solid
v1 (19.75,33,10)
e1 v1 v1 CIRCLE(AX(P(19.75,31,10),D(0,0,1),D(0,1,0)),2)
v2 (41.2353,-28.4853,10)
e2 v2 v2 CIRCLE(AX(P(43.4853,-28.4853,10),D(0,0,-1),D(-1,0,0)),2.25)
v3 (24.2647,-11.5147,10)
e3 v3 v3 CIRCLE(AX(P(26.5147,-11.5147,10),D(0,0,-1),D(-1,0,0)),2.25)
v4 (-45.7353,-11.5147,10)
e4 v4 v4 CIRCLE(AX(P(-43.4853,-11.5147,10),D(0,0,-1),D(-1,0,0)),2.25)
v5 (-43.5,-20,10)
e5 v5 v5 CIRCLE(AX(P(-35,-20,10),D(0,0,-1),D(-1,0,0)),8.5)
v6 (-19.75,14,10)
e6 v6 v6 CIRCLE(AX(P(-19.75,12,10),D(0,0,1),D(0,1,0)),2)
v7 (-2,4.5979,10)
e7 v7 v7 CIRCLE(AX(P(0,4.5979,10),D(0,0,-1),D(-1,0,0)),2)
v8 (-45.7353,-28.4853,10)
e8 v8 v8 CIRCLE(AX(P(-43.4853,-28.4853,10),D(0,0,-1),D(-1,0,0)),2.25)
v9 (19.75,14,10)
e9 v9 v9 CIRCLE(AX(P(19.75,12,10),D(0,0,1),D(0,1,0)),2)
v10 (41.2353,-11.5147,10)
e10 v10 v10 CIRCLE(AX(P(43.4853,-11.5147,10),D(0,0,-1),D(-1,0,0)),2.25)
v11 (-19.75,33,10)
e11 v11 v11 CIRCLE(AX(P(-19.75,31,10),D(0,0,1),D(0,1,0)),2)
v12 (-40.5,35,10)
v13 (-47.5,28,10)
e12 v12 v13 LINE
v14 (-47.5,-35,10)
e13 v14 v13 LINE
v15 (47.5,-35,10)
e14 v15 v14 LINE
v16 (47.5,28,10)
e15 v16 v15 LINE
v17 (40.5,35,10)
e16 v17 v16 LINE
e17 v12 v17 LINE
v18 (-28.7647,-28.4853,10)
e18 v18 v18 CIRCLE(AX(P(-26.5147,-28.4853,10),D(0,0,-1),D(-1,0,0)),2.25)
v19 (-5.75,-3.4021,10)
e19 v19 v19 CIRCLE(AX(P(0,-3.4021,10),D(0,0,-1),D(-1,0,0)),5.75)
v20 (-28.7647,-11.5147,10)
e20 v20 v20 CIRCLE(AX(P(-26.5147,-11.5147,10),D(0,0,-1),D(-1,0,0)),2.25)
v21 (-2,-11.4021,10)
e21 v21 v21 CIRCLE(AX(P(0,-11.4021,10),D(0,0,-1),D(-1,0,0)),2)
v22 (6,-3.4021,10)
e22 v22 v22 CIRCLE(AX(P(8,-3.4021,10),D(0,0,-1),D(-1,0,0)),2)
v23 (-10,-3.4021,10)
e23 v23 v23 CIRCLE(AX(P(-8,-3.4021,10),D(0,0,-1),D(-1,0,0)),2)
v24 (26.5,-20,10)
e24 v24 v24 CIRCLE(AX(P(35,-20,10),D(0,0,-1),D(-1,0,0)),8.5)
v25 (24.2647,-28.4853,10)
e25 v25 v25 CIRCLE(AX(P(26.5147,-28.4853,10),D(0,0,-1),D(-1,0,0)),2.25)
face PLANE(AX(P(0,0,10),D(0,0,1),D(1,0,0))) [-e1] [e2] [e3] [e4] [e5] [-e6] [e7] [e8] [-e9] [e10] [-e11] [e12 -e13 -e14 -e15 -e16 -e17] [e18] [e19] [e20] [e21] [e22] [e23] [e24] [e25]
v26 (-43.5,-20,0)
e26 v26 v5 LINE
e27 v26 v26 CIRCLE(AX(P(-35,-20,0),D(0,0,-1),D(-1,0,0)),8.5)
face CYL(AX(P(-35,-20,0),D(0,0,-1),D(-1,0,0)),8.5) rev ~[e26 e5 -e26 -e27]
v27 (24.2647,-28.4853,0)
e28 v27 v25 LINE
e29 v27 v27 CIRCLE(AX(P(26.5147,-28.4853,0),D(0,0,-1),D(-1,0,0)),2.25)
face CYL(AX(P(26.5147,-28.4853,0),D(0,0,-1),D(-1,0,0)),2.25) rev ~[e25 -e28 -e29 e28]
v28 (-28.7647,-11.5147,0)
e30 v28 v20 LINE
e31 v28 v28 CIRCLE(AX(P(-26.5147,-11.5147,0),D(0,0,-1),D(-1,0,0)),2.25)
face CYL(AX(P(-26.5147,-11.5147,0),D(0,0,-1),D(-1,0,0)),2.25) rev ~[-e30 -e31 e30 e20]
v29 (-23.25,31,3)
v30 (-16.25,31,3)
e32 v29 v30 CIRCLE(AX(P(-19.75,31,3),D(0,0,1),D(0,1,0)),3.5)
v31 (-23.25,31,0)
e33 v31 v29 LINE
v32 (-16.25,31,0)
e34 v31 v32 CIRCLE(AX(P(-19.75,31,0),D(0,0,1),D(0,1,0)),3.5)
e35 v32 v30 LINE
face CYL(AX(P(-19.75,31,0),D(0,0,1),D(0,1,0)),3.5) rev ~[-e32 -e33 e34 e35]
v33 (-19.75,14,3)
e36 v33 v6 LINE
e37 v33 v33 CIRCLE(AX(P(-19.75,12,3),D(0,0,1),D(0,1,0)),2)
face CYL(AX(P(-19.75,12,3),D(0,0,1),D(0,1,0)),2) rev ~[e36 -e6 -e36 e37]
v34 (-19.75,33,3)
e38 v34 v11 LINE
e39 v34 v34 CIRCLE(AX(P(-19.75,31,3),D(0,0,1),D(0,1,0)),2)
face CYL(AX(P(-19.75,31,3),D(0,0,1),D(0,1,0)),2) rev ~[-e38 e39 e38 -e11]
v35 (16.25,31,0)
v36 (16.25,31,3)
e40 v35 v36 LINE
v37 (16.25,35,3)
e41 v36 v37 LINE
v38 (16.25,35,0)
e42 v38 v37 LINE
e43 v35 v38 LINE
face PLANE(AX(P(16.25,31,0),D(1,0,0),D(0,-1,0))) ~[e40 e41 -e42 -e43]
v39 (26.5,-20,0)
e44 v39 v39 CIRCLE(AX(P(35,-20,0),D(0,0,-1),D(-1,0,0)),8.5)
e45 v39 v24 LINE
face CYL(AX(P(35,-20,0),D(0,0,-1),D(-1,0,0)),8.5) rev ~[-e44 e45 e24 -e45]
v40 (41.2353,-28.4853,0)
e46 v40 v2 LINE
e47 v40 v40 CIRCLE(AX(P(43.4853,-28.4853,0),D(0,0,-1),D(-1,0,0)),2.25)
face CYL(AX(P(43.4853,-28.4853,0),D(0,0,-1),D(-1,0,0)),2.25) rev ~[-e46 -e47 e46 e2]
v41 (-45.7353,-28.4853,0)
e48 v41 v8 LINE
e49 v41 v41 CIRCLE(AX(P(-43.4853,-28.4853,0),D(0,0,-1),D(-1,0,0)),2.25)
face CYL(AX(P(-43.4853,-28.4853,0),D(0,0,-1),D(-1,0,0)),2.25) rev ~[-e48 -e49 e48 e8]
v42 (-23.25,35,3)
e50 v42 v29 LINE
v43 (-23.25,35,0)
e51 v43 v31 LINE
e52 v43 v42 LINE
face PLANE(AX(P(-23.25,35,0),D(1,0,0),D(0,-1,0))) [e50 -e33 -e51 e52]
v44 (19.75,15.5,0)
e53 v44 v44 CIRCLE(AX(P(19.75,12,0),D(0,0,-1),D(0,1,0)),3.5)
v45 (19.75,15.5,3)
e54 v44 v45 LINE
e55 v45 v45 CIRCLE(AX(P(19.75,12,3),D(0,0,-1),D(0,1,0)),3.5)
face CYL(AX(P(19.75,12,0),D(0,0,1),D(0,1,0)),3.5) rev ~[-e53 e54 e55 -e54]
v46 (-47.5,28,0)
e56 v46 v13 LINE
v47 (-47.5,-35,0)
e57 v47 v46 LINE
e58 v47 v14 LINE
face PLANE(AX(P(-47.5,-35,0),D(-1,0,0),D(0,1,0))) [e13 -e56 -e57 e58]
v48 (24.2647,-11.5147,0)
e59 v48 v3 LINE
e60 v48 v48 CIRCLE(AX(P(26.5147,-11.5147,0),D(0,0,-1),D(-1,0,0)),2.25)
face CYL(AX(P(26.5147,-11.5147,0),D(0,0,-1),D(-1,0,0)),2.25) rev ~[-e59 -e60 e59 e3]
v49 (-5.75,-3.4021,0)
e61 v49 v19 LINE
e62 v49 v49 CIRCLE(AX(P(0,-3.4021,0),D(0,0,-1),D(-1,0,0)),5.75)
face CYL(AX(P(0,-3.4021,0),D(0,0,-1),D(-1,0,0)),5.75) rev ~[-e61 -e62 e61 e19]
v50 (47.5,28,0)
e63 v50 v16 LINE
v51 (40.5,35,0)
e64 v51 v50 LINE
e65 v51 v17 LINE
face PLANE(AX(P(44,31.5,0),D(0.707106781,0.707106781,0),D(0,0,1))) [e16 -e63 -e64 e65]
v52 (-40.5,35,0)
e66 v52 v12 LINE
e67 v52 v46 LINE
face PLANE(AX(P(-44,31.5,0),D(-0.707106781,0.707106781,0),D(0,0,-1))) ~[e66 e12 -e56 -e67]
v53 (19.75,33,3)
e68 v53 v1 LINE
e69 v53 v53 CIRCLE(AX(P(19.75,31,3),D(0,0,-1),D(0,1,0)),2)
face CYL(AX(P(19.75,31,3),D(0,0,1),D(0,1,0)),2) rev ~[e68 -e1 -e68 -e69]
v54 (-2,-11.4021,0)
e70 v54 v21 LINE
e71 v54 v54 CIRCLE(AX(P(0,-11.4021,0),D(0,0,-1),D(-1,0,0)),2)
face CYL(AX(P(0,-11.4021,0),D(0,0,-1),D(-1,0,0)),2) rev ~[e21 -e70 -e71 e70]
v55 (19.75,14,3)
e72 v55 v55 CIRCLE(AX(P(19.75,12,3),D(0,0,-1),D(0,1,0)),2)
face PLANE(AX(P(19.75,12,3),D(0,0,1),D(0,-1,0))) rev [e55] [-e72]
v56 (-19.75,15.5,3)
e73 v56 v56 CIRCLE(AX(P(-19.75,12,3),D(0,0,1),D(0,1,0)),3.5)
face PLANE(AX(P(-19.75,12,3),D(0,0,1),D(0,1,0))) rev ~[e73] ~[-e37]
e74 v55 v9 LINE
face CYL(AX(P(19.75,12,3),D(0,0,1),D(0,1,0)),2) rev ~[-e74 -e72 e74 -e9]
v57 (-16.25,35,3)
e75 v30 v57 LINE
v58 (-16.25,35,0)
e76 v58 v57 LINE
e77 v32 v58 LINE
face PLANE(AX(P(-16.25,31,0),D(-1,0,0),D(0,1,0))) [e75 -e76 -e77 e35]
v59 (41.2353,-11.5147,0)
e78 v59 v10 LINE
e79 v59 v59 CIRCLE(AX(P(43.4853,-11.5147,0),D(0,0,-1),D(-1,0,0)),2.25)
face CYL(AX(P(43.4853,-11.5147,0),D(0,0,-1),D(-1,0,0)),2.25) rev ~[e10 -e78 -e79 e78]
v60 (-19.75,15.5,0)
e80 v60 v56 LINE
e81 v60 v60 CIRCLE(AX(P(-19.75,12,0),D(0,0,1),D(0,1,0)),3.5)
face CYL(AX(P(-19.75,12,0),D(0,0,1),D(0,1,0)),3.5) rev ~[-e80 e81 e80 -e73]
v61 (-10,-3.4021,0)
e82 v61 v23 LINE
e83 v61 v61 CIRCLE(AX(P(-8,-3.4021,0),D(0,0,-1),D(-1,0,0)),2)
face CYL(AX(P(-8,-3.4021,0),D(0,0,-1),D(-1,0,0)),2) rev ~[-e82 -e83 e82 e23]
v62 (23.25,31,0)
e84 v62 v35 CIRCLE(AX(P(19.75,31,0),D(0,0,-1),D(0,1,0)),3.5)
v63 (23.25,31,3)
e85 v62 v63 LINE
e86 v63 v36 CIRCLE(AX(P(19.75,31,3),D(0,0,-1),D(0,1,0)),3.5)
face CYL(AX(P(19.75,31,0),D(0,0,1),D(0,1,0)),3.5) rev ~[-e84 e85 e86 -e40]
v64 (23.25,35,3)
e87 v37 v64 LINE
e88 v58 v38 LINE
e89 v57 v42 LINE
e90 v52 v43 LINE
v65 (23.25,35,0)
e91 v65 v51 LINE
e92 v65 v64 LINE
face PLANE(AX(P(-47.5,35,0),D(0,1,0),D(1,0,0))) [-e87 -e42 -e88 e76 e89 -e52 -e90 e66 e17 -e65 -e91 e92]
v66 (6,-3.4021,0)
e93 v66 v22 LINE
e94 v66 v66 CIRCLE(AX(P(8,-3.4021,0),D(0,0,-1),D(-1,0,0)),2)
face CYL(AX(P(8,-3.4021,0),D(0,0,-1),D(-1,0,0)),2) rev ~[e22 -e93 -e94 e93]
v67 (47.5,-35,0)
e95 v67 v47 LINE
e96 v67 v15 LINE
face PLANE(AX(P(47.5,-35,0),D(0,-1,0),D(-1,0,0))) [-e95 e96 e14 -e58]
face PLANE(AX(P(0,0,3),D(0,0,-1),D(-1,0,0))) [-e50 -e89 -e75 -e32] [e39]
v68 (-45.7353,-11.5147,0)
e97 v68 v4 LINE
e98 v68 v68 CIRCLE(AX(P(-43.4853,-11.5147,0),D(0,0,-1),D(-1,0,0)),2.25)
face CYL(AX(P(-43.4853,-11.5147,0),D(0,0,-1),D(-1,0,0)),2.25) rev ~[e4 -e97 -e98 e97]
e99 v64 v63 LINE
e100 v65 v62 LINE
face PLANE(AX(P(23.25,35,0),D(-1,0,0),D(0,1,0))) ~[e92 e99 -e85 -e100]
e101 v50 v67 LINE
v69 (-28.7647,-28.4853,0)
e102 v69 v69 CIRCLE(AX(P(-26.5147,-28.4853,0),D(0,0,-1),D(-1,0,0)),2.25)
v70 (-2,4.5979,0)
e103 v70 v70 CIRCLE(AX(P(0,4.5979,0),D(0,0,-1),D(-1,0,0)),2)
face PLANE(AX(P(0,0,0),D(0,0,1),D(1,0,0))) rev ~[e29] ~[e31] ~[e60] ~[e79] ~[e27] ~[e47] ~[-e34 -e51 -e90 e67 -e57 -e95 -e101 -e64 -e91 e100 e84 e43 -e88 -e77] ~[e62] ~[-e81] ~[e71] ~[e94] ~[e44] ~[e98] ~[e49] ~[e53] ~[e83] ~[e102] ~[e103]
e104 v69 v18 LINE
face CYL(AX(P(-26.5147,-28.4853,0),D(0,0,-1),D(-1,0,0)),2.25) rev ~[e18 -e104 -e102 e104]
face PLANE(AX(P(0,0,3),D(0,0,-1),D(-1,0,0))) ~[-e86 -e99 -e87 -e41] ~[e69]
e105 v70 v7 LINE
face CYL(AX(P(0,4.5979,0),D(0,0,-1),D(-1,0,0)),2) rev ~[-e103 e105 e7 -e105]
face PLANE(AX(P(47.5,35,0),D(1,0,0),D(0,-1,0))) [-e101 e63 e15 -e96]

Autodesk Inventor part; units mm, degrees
ref_plane "YZ Plane" through (0, 0, 0) normal (1, 0, 0) x (0, 1, 0)
ref_plane "XZ Plane" through (0, 0, 0) normal (0, 1, 0) x (-1, 0, 0)
ref_plane "XY Plane" through (0, 0, 0) normal (0, 0, 1) x (1, 0, 0)
sketch "Sketch1" plane through (0, 0, 0) normal (0, 0, 1) x (1, 0, 0)
  line L0 (-47.5, 35) -> (47.5, 35)
  line L1 (47.5, 35) -> (47.5, -35)
  line L2 (47.5, -35) -> (-47.5, -35)
  line L3 (-47.5, -35) -> (-47.5, 35)
  point P0 (0, 0)
  point P1 (0, 35)
  point P2 (-47.5, 0)
  dimension "d0" = 95
  dimension "d1" = 70
extrude "Extrusion1" add sketch "Sketch1" along normal blind 10
sketch "Sketch2" plane through (0, 0, 0) normal (0, 0, -1) x (-1, 0, 0)
  line L0 (0, 71.7114) -> (0, -41.7697) construction
  line L1 (-47.5, 35) -> (47.5, 35) construction
  line L2 (-22.5, 19.157) -> (-23.5, 19.157) projected
  circle A0 centre (35, -20) radius 8.5
  line L3 (47.5, -35) -> (-47.5, -35) projected
  line L4 (-47.5, -35) -> (-47.5, 35) projected
  circle A1 centre (43.4853, -28.4853) radius 2.25
  line L5 (47.5, 35) -> (47.5, -35) construction
  line L6 (26.5147, -11.5147) -> (43.4853, -11.5147) construction
  line L7 (43.4853, -11.5147) -> (43.4853, -28.4853) construction
  line L8 (43.4853, -28.4853) -> (26.5147, -28.4853) construction
  line L9 (26.5147, -28.4853) -> (26.5147, -11.5147) construction
  circle A2 centre (43.4853, -11.5147) radius 2.25
  circle A3 centre (26.5147, -11.5147) radius 2.25
  circle A4 centre (26.5147, -28.4853) radius 2.25
  circle A5 centre (-35, -20) radius 8.5
  circle A6 centre (-43.4853, -28.4853) radius 2.25
  circle A7 centre (-43.4853, -11.5147) radius 2.25
  circle A8 centre (-26.5147, -11.5147) radius 2.25
  circle A9 centre (-26.5147, -28.4853) radius 2.25
  point P0 (0, 0)
  point P1 (0, 14.9709)
  point P2 (0, 35)
  point P3 (35, -11.5147)
  point P4 (26.5147, -20)
  dimension "d21" = 15
  dimension "d22" = 12.5
  dimension "d23" = 17
  dimension "d26" = 4.5
  dimension "d27" = 16.9706
  dimension "d28" = 16.9706
extrude "Extrusion2" cut sketch "Sketch2" against normal through all
sketch "Sketch3" plane through (0, 0, 0) normal (0, 0, -1) x (-1, 0, 0)
  circle A0 centre (0, -3.4021) radius 5.75
  circle A1 centre (35, -20) radius 8.5 projected
  line L0 (-47.5, 35) -> (47.5, 35) projected
  line L1 (47.5, 35) -> (47.5, -35) projected
  line L2 (47.5, -35) -> (-47.5, -35) projected
  line L3 (-47.5, -35) -> (-47.5, 35) projected
  circle A2 centre (35, -20) radius 8.5 projected
  circle A3 centre (0, 4.5979) radius 2
  circle A4 centre (-8, -3.4021) radius 2
  circle A5 centre (0, -11.4021) radius 2
  circle A6 centre (8, -3.4021) radius 2
  circle A7 centre (26.5147, -11.5147) radius 2.25 projected
  circle A8 centre (-43.4853, -28.4853) radius 2.25 projected
  circle A9 centre (-43.4853, -11.5147) radius 2.25 projected
  circle A10 centre (26.5147, -28.4853) radius 2.25 projected
  circle A11 centre (43.4853, -11.5147) radius 2.25 projected
  circle A12 centre (-26.5147, -28.4853) radius 2.25 projected
  circle A13 centre (-26.5147, -11.5147) radius 2.25 projected
  circle A14 centre (43.4853, -28.4853) radius 2.25 projected
  circle A15 centre (26.5147, -11.5147) radius 2.25 projected
  circle A16 centre (-43.4853, -28.4853) radius 2.25 projected
  circle A17 centre (-43.4853, -11.5147) radius 2.25 projected
  circle A18 centre (26.5147, -28.4853) radius 2.25 projected
  circle A19 centre (43.4853, -11.5147) radius 2.25 projected
  circle A20 centre (-26.5147, -28.4853) radius 2.25 projected
  circle A21 centre (-26.5147, -11.5147) radius 2.25 projected
  circle A22 centre (43.4853, -28.4853) radius 2.25 projected
  circle A23 centre (-35, -20) radius 8.5 projected
  circle A24 centre (-35, -20) radius 8.5 projected
  line L4 (-47.5, 35) -> (47.5, 35) projected
  line L5 (47.5, 35) -> (47.5, -35) projected
  line L6 (47.5, -35) -> (-47.5, -35) projected
  line L7 (-47.5, -35) -> (-47.5, 35) projected
  point P0 (0, 0)
  point P1 (1.1874, 2.9885)
  point P2 (-1.1874, 2.9885)
  point P3 (0, -3.4021)
  point P4 (0, -35)
  dimension "d10" = 31.5979
  dimension "d12" = 11.5
  dimension "d13" = 4
  dimension "d14" = 8
  dimension "d19" = 360
extrude "Extrusion3" cut sketch "Sketch3" against normal through all contours A0 | A3 | A4 | A5 | A6
sketch "Sketch5" plane through (0, 0, 0) normal (0, 0, -1) x (-1, 0, 0)
  circle A0 centre (19.75, 31) radius 2
  circle A1 centre (19.75, 12) radius 2
  line L0 (47.5, 35) -> (47.5, -35) projected
  line L1 (-47.5, 35) -> (47.5, 35) projected
  point P0 (0, 0)
  dimension "d29" = 27.75
  dimension "d30" = 4
  dimension "d31" = 4
  dimension "d32" = 19
hole "Hole1" at (-19.75, 12, 0) at (-19.75, 31, 0) direction (0, 0, 1) diameter 4 depth 11 tip angle 118 counterbore diameter 7 counterbore depth 3
sketch "Sketch6" plane through (0, 0, 0) normal (0, 0, -1) x (-1, 0, 0)
  line L0 (23.25, 27.5) -> (16.25, 27.5)
  line L1 (16.25, 27.5) -> (16.25, 35)
  line L2 (16.25, 35) -> (23.25, 35)
  line L3 (23.25, 35) -> (23.25, 27.5)
  line L4 (-47.5, 35) -> (47.5, 35) projected
  circle A0 centre (19.75, 31) radius 3.5 projected
  point P0 (0, 0)
  point P1 (16.25, 31)
  point P2 (23.25, 31)
extrude "Extrusion4" cut sketch "Sketch6" against normal up to surface (3 mm away) contours A0 L1 L2 L3
mirror "Mirror1" about plane through (0, 0, 0) normal (1, 0, 0) of "Extrusion4", "Hole1"
chamfer "Chamfer1" distance 7 angle 45 2 edges at (-47.5, 35, 5) (47.5, 35, 5)
equation "\"BendRadius\" = Thickness"
equation "\"BendReliefWidth\" = Thickness"
equation "\"BendReliefDepth\" = 0.5 * Thickness"
equation "\"CornerReliefSize\" = 4 * Thickness"
equation "\"MinimumRemnant\" = 2 * Thickness"
equation "\"TransitionRadius\" = BendRadius"
equation "\"JacobiRadiusSize\" = Thickness"
equation "\"GapSize\" = Thickness"
equation "\"Thickness\" = 0.5"
properties part number "0008-10-001" material "ABS Plastic"
